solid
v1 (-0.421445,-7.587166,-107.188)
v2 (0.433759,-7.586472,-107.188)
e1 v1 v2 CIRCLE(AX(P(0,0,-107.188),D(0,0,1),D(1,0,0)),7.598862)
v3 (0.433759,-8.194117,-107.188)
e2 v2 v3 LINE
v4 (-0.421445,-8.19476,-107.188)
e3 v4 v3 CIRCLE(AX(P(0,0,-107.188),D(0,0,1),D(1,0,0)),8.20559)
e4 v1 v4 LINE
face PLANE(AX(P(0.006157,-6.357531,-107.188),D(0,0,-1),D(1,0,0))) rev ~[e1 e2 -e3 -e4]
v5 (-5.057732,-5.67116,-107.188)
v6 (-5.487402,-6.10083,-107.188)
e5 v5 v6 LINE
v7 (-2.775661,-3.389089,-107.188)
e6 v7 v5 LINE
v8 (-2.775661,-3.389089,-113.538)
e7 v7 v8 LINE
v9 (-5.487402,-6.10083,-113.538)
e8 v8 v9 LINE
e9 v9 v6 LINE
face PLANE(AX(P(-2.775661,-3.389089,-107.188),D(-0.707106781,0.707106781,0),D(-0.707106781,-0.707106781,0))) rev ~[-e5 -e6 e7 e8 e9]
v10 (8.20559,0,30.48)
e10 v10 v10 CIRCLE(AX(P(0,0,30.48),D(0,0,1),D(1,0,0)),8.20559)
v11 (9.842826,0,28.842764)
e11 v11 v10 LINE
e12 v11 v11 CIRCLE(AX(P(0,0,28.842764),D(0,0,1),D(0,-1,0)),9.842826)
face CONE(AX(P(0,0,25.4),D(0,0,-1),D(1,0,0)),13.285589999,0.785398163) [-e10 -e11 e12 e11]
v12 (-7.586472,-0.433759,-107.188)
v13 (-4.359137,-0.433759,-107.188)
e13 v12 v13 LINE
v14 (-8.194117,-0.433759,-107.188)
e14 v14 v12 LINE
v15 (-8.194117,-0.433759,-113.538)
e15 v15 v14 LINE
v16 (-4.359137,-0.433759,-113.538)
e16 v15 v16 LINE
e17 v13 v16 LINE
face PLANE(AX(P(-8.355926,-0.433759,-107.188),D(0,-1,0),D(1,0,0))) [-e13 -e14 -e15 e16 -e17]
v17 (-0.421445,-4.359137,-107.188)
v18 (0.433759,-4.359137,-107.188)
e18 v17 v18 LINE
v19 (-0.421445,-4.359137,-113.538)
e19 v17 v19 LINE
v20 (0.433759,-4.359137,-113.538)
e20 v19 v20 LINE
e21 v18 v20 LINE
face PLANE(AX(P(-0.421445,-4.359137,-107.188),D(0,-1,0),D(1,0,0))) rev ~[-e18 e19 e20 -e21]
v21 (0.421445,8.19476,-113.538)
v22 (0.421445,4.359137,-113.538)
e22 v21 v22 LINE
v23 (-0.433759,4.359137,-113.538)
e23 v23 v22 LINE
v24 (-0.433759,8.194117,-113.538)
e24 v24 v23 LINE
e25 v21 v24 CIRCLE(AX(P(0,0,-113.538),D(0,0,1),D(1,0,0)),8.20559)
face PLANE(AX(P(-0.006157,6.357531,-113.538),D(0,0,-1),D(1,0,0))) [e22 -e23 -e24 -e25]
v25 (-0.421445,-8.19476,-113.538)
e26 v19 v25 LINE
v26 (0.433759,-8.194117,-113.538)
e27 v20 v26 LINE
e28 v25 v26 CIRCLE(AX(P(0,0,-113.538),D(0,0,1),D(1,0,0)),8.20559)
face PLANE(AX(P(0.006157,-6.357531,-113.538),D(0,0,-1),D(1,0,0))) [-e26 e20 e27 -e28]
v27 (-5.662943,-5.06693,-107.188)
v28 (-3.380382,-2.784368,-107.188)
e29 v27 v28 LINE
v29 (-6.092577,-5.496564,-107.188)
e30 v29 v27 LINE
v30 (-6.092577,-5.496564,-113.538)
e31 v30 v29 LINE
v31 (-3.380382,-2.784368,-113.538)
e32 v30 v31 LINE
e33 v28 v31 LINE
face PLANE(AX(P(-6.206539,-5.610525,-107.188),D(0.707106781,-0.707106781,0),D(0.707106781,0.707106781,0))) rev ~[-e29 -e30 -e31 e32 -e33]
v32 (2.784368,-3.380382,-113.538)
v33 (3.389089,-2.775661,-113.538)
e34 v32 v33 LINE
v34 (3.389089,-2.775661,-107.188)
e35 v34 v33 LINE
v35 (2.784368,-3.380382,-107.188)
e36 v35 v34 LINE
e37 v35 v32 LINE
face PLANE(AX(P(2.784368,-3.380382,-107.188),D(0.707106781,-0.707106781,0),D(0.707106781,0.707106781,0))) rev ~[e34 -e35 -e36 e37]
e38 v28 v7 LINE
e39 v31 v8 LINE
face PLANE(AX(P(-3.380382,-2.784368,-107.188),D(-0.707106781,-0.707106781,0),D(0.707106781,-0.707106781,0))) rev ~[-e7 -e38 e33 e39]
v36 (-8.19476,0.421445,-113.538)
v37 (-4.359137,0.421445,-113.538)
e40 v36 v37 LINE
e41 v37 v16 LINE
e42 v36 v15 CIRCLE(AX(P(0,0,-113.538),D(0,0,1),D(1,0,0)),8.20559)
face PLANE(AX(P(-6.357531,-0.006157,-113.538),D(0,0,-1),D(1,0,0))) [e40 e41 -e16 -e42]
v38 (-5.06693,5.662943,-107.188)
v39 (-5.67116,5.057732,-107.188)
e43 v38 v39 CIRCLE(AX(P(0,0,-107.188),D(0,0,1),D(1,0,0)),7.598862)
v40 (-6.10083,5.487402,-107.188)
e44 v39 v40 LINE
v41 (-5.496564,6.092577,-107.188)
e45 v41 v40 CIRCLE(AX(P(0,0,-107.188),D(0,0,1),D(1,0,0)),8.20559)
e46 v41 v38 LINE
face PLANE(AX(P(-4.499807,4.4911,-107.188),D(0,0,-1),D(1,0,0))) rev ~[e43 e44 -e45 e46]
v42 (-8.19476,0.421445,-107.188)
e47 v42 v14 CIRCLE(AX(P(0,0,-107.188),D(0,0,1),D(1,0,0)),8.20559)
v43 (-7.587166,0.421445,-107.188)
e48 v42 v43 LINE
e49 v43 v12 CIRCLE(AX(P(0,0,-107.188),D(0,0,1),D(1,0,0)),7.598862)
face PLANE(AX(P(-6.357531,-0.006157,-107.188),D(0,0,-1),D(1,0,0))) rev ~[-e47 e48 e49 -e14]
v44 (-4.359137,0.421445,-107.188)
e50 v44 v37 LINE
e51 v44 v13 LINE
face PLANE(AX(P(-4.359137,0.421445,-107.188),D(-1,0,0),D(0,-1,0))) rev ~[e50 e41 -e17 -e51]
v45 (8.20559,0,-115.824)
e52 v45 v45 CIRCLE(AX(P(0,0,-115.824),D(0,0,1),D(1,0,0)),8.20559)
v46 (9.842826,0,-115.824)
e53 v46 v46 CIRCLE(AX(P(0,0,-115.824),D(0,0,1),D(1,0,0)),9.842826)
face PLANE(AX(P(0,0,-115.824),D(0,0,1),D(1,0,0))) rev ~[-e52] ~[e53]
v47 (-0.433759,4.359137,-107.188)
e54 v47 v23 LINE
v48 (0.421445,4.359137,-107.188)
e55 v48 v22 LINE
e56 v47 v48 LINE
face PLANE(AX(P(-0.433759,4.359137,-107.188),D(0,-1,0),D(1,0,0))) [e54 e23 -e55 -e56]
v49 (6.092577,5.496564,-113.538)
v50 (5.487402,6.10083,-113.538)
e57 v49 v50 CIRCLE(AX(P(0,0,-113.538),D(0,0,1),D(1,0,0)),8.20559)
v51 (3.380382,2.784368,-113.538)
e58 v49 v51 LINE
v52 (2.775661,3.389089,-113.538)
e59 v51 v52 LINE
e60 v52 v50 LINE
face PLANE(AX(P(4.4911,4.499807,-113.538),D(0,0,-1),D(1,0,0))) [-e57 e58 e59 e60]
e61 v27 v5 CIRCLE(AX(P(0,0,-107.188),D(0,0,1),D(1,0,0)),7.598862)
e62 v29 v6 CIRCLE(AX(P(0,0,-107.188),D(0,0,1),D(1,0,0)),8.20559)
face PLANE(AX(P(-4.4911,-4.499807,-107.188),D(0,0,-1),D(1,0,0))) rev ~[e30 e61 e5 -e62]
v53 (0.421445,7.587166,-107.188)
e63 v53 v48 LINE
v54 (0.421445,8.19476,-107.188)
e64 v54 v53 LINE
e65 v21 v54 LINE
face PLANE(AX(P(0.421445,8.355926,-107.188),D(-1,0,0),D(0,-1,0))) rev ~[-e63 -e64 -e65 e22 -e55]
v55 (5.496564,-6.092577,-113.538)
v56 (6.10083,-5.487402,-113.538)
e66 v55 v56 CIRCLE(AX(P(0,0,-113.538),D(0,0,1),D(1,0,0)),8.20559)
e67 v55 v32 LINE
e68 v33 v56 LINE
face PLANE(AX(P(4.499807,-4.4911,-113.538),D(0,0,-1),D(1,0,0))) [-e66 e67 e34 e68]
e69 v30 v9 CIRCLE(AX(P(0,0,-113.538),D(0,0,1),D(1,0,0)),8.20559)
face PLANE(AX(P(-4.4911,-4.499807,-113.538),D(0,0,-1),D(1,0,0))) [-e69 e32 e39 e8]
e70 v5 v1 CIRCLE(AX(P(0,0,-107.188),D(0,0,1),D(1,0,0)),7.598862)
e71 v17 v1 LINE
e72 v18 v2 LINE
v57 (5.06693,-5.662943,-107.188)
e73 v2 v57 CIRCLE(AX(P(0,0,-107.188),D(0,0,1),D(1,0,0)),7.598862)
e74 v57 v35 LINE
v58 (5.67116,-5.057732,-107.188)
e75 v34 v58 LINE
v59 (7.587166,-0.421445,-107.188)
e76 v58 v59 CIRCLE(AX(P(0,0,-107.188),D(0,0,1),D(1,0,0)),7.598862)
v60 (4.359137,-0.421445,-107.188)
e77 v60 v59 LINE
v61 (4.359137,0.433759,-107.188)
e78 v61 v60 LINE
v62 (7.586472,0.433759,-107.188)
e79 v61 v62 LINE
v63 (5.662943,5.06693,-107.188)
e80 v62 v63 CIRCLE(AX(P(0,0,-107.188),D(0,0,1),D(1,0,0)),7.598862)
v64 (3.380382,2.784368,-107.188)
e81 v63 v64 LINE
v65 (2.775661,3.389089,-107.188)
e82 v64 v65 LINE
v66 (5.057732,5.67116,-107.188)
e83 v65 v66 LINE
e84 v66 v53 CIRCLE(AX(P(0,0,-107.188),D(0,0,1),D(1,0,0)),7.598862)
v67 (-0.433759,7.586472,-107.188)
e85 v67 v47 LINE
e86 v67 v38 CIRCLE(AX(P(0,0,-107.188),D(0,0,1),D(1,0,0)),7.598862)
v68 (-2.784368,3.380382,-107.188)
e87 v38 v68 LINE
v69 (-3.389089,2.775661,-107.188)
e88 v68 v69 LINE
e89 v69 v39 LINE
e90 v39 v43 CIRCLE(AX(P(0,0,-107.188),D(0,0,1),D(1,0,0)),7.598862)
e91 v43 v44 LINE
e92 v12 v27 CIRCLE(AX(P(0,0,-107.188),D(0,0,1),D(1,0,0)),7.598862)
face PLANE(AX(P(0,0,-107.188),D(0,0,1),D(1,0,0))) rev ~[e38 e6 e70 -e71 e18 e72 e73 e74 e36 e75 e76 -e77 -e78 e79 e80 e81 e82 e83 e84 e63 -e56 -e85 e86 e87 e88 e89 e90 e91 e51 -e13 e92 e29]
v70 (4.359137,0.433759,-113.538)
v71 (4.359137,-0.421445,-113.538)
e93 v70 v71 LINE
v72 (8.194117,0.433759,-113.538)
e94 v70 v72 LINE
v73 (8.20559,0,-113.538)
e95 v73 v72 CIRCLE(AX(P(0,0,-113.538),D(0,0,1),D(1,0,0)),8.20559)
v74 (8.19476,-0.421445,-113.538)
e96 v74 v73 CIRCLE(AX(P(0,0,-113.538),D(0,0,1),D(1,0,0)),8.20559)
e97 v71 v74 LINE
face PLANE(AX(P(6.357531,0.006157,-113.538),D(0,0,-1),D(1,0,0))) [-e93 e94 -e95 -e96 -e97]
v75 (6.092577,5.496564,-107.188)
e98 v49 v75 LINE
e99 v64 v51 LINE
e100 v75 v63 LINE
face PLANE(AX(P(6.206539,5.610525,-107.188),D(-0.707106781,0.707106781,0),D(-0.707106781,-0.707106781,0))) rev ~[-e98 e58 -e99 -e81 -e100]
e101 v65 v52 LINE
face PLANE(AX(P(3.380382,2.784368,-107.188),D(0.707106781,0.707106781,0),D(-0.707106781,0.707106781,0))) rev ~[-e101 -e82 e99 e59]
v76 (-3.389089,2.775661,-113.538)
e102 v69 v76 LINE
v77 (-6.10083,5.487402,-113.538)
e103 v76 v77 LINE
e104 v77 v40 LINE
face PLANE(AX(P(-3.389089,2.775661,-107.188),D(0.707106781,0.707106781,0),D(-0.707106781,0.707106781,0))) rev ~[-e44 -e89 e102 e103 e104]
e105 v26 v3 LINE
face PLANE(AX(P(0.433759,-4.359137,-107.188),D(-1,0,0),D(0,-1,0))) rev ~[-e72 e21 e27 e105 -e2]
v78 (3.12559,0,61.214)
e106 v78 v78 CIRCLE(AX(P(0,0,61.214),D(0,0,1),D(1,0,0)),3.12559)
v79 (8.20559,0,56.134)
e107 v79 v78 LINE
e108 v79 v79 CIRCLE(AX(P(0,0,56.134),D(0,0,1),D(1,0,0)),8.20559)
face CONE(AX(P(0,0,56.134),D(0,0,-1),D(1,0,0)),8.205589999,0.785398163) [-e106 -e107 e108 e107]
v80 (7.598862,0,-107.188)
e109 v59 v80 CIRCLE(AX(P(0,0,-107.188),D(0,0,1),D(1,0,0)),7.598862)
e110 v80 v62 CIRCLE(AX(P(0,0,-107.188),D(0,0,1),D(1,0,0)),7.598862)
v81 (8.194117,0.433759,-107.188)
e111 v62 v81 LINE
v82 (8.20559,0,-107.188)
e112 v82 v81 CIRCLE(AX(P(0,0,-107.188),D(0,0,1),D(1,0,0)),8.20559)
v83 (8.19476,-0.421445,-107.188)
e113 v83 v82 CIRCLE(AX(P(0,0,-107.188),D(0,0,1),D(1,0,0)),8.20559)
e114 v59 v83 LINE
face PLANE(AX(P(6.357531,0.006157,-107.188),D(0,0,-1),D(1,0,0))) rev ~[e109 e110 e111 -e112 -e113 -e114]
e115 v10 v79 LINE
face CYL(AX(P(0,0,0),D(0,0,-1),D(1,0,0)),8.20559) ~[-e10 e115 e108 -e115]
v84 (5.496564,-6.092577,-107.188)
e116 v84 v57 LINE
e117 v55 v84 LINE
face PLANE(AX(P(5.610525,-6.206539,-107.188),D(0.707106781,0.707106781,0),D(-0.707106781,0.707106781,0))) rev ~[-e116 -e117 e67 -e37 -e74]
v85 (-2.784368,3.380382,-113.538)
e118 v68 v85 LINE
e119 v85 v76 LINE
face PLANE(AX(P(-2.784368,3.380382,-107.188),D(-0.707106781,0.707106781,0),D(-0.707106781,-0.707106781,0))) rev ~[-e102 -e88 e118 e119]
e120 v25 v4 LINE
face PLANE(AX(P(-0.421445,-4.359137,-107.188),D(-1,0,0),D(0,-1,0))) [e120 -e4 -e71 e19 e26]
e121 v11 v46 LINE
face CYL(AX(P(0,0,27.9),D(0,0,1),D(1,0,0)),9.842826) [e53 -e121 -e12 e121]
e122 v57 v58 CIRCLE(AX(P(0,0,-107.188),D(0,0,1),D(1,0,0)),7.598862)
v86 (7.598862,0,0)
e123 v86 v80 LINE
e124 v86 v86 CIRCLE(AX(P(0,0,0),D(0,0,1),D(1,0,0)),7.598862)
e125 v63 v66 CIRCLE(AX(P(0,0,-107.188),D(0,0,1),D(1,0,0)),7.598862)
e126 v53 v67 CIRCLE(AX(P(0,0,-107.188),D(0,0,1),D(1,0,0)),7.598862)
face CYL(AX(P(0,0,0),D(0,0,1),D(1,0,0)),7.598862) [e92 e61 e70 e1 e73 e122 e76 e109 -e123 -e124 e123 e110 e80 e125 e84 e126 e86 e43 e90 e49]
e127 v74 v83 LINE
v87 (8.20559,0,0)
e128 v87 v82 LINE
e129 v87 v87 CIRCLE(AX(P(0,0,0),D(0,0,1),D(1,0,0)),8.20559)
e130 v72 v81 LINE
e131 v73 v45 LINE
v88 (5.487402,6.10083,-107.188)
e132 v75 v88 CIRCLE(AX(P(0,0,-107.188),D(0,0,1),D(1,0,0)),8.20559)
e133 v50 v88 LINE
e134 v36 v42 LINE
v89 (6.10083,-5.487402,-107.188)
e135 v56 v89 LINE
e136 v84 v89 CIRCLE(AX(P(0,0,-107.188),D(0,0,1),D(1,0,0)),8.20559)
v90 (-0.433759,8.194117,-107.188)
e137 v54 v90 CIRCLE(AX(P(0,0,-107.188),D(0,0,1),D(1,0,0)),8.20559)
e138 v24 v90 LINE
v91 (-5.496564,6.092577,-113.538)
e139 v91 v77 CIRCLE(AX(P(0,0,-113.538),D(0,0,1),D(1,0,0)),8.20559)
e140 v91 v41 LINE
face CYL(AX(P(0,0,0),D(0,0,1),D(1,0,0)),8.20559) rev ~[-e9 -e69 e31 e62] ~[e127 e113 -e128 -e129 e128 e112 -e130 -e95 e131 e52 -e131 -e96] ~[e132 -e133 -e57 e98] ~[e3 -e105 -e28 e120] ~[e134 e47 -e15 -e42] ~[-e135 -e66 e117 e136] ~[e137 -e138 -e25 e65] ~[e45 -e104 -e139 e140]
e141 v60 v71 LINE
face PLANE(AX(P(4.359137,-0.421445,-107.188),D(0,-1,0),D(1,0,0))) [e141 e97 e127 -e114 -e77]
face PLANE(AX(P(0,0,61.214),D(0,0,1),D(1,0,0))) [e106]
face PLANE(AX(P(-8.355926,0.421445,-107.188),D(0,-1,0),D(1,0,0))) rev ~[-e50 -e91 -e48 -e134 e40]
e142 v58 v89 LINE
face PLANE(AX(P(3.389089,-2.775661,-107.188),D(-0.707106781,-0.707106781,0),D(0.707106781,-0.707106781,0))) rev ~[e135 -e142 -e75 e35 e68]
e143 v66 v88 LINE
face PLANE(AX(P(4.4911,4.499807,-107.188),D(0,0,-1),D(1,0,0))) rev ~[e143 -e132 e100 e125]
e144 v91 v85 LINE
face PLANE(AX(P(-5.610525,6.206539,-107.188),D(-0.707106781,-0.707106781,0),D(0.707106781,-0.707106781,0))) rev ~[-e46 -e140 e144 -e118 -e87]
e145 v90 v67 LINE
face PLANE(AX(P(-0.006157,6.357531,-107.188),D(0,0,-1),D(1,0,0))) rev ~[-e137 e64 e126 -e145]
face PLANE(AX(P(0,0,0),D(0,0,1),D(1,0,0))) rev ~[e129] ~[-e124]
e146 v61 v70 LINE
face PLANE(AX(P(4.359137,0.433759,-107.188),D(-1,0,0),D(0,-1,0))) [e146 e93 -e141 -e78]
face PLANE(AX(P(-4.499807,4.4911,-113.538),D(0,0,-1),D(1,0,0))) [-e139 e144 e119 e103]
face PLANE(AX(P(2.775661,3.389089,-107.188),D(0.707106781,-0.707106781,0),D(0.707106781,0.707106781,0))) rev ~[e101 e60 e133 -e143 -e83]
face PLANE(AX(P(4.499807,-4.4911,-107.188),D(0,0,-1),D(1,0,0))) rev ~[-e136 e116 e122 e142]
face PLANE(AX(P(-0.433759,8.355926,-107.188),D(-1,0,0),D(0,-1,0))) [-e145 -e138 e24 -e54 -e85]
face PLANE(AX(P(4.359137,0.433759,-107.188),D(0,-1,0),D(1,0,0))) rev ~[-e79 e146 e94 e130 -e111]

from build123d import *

# Parameters (mm, degrees)
F0_R        = 9.8428256451
F0_R_2      = 8.2055899986
F1_DEPTH    = 25.4
F2_DEPTH    = 115.824
F3_DEPTH    = 61.214
F3_FACE_R   = 8.2055899986
F6_S5_R     = 9.8428256451
F6_T6_DEPTH = 20
F5_R        = 7.5988621304
F7_DEPTH    = 107.188
F8_W        = 0.8552042418
F8_H        = 3.9967889898
F8_W_2      = 3.9967889898
F8_H_2      = 0.8552042418
F9_DEPTH    = 6.35


# Not quite as in the source:
# - a fillet or chamfer that OpenCascade refuses, or shapes differently, is made with other operations: its cross-section is extruded or revolved along the edge and cut away or added


with BuildPart() as f1:
    # F0 (on Top) → F1 (new body)
    with BuildSketch(Plane.XY):
        Circle(F0_R)
        Circle(F0_R_2, mode=Mode.SUBTRACT)
    extrude(amount=F1_DEPTH)

    # F2 (add): a face of the model
    f2_faces = [f1.faces().sort_by_distance(p)[0] for p in [
        (-9.5644284947, 0, 0),
    ]]
    extrude(f2_faces, amount=F2_DEPTH)

    # F0 (on Top) → F3 (join)
    with BuildSketch(Plane.XY):
        Circle(F0_R_2)
    extrude(amount=F3_DEPTH)

    # F3_face (on face) → F4 section 0
    with BuildSketch(Plane.XY.offset(61.214), mode=Mode.PRIVATE) as f4_s0:
        Circle(F3_FACE_R)
    loft([Vertex(0, 0, 0), f4_s0.sketch])

    # F6: chamfer of 5.08 on 3 edges, made by hand


with BuildPart() as f6_tool2:
    # F6_s3 → F6_t4 (revolve)
    with BuildSketch(Plane.XZ):
        Polygon((13.2855899986, 25.4), (8.2055899986, 30.48), (8.2055899986, 25.4), align=None)
    revolve(axis=Axis((0, 0, 25.4), (0, 0, 1)))

    # F6_s5 → F6_t6 (intersect, symmetric)
    with BuildSketch(Plane.XY.offset(27.9)):
        Circle(F6_S5_R)
    extrude(amount=F6_T6_DEPTH, both=True, mode=Mode.INTERSECT)


with BuildPart() as f1_1:
    add(f1.part)

    # F6_t1: union F6_tool2
    add(f6_tool2.part)

    # F6_s7 → F6_t8 (revolve, cut)
    with BuildSketch(Plane.XZ):
        Polygon((8.2055899986, 56.134), (3.1255899986, 61.214), (8.2055899986, 61.214), align=None)
    revolve(axis=Axis((0, 0, 61.214), (0, 0, 1)), mode=Mode.SUBTRACT)

    # F5 (on Top) → F7 (join)
    with BuildSketch(Plane.XY):
        Circle(F5_R)
    extrude(amount=-F7_DEPTH)

    # F8 (on face) → F9 (join)
    with BuildSketch(Plane(origin=(0, 0, -107.188), x_dir=(1, 0, 0), z_dir=(0, 0, -1))):
        with Locations((0.0061568862, 6.3575312961)):
            Rectangle(F8_W, F8_H)
        Polygon((-6.2065385732, 5.6105250065), (-3.3803819756, 2.7843684089), (-2.7756612569, 3.3890891276), (-5.6018178545, 6.2152457252), align=None)
        with Locations((-6.3575312961, 0.0061568862)):
            Rectangle(F8_W_2, F8_H_2)
        Polygon((-5.6105250065, -6.2065385732), (-2.7843684089, -3.3803819756), (-3.3890891276, -2.7756612569), (-6.2152457252, -5.6018178545), align=None)
        with Locations((-0.0061568862, -6.3575312961)):
            Rectangle(F8_W, F8_H)
        Polygon((6.2065385732, -5.6105250065), (3.3803819756, -2.7843684089), (2.7756612569, -3.3890891276), (5.6018178545, -6.2152457252), align=None)
        with Locations((6.3575312961, -0.0061568862)):
            Rectangle(F8_W_2, F8_H_2)
        Polygon((5.6105250065, 6.2065385732), (2.7843684089, 3.3803819756), (3.3890891276, 2.7756612569), (6.2152457252, 5.6018178545), align=None)
    extrude(amount=F9_DEPTH)


solid = f1_1.part
